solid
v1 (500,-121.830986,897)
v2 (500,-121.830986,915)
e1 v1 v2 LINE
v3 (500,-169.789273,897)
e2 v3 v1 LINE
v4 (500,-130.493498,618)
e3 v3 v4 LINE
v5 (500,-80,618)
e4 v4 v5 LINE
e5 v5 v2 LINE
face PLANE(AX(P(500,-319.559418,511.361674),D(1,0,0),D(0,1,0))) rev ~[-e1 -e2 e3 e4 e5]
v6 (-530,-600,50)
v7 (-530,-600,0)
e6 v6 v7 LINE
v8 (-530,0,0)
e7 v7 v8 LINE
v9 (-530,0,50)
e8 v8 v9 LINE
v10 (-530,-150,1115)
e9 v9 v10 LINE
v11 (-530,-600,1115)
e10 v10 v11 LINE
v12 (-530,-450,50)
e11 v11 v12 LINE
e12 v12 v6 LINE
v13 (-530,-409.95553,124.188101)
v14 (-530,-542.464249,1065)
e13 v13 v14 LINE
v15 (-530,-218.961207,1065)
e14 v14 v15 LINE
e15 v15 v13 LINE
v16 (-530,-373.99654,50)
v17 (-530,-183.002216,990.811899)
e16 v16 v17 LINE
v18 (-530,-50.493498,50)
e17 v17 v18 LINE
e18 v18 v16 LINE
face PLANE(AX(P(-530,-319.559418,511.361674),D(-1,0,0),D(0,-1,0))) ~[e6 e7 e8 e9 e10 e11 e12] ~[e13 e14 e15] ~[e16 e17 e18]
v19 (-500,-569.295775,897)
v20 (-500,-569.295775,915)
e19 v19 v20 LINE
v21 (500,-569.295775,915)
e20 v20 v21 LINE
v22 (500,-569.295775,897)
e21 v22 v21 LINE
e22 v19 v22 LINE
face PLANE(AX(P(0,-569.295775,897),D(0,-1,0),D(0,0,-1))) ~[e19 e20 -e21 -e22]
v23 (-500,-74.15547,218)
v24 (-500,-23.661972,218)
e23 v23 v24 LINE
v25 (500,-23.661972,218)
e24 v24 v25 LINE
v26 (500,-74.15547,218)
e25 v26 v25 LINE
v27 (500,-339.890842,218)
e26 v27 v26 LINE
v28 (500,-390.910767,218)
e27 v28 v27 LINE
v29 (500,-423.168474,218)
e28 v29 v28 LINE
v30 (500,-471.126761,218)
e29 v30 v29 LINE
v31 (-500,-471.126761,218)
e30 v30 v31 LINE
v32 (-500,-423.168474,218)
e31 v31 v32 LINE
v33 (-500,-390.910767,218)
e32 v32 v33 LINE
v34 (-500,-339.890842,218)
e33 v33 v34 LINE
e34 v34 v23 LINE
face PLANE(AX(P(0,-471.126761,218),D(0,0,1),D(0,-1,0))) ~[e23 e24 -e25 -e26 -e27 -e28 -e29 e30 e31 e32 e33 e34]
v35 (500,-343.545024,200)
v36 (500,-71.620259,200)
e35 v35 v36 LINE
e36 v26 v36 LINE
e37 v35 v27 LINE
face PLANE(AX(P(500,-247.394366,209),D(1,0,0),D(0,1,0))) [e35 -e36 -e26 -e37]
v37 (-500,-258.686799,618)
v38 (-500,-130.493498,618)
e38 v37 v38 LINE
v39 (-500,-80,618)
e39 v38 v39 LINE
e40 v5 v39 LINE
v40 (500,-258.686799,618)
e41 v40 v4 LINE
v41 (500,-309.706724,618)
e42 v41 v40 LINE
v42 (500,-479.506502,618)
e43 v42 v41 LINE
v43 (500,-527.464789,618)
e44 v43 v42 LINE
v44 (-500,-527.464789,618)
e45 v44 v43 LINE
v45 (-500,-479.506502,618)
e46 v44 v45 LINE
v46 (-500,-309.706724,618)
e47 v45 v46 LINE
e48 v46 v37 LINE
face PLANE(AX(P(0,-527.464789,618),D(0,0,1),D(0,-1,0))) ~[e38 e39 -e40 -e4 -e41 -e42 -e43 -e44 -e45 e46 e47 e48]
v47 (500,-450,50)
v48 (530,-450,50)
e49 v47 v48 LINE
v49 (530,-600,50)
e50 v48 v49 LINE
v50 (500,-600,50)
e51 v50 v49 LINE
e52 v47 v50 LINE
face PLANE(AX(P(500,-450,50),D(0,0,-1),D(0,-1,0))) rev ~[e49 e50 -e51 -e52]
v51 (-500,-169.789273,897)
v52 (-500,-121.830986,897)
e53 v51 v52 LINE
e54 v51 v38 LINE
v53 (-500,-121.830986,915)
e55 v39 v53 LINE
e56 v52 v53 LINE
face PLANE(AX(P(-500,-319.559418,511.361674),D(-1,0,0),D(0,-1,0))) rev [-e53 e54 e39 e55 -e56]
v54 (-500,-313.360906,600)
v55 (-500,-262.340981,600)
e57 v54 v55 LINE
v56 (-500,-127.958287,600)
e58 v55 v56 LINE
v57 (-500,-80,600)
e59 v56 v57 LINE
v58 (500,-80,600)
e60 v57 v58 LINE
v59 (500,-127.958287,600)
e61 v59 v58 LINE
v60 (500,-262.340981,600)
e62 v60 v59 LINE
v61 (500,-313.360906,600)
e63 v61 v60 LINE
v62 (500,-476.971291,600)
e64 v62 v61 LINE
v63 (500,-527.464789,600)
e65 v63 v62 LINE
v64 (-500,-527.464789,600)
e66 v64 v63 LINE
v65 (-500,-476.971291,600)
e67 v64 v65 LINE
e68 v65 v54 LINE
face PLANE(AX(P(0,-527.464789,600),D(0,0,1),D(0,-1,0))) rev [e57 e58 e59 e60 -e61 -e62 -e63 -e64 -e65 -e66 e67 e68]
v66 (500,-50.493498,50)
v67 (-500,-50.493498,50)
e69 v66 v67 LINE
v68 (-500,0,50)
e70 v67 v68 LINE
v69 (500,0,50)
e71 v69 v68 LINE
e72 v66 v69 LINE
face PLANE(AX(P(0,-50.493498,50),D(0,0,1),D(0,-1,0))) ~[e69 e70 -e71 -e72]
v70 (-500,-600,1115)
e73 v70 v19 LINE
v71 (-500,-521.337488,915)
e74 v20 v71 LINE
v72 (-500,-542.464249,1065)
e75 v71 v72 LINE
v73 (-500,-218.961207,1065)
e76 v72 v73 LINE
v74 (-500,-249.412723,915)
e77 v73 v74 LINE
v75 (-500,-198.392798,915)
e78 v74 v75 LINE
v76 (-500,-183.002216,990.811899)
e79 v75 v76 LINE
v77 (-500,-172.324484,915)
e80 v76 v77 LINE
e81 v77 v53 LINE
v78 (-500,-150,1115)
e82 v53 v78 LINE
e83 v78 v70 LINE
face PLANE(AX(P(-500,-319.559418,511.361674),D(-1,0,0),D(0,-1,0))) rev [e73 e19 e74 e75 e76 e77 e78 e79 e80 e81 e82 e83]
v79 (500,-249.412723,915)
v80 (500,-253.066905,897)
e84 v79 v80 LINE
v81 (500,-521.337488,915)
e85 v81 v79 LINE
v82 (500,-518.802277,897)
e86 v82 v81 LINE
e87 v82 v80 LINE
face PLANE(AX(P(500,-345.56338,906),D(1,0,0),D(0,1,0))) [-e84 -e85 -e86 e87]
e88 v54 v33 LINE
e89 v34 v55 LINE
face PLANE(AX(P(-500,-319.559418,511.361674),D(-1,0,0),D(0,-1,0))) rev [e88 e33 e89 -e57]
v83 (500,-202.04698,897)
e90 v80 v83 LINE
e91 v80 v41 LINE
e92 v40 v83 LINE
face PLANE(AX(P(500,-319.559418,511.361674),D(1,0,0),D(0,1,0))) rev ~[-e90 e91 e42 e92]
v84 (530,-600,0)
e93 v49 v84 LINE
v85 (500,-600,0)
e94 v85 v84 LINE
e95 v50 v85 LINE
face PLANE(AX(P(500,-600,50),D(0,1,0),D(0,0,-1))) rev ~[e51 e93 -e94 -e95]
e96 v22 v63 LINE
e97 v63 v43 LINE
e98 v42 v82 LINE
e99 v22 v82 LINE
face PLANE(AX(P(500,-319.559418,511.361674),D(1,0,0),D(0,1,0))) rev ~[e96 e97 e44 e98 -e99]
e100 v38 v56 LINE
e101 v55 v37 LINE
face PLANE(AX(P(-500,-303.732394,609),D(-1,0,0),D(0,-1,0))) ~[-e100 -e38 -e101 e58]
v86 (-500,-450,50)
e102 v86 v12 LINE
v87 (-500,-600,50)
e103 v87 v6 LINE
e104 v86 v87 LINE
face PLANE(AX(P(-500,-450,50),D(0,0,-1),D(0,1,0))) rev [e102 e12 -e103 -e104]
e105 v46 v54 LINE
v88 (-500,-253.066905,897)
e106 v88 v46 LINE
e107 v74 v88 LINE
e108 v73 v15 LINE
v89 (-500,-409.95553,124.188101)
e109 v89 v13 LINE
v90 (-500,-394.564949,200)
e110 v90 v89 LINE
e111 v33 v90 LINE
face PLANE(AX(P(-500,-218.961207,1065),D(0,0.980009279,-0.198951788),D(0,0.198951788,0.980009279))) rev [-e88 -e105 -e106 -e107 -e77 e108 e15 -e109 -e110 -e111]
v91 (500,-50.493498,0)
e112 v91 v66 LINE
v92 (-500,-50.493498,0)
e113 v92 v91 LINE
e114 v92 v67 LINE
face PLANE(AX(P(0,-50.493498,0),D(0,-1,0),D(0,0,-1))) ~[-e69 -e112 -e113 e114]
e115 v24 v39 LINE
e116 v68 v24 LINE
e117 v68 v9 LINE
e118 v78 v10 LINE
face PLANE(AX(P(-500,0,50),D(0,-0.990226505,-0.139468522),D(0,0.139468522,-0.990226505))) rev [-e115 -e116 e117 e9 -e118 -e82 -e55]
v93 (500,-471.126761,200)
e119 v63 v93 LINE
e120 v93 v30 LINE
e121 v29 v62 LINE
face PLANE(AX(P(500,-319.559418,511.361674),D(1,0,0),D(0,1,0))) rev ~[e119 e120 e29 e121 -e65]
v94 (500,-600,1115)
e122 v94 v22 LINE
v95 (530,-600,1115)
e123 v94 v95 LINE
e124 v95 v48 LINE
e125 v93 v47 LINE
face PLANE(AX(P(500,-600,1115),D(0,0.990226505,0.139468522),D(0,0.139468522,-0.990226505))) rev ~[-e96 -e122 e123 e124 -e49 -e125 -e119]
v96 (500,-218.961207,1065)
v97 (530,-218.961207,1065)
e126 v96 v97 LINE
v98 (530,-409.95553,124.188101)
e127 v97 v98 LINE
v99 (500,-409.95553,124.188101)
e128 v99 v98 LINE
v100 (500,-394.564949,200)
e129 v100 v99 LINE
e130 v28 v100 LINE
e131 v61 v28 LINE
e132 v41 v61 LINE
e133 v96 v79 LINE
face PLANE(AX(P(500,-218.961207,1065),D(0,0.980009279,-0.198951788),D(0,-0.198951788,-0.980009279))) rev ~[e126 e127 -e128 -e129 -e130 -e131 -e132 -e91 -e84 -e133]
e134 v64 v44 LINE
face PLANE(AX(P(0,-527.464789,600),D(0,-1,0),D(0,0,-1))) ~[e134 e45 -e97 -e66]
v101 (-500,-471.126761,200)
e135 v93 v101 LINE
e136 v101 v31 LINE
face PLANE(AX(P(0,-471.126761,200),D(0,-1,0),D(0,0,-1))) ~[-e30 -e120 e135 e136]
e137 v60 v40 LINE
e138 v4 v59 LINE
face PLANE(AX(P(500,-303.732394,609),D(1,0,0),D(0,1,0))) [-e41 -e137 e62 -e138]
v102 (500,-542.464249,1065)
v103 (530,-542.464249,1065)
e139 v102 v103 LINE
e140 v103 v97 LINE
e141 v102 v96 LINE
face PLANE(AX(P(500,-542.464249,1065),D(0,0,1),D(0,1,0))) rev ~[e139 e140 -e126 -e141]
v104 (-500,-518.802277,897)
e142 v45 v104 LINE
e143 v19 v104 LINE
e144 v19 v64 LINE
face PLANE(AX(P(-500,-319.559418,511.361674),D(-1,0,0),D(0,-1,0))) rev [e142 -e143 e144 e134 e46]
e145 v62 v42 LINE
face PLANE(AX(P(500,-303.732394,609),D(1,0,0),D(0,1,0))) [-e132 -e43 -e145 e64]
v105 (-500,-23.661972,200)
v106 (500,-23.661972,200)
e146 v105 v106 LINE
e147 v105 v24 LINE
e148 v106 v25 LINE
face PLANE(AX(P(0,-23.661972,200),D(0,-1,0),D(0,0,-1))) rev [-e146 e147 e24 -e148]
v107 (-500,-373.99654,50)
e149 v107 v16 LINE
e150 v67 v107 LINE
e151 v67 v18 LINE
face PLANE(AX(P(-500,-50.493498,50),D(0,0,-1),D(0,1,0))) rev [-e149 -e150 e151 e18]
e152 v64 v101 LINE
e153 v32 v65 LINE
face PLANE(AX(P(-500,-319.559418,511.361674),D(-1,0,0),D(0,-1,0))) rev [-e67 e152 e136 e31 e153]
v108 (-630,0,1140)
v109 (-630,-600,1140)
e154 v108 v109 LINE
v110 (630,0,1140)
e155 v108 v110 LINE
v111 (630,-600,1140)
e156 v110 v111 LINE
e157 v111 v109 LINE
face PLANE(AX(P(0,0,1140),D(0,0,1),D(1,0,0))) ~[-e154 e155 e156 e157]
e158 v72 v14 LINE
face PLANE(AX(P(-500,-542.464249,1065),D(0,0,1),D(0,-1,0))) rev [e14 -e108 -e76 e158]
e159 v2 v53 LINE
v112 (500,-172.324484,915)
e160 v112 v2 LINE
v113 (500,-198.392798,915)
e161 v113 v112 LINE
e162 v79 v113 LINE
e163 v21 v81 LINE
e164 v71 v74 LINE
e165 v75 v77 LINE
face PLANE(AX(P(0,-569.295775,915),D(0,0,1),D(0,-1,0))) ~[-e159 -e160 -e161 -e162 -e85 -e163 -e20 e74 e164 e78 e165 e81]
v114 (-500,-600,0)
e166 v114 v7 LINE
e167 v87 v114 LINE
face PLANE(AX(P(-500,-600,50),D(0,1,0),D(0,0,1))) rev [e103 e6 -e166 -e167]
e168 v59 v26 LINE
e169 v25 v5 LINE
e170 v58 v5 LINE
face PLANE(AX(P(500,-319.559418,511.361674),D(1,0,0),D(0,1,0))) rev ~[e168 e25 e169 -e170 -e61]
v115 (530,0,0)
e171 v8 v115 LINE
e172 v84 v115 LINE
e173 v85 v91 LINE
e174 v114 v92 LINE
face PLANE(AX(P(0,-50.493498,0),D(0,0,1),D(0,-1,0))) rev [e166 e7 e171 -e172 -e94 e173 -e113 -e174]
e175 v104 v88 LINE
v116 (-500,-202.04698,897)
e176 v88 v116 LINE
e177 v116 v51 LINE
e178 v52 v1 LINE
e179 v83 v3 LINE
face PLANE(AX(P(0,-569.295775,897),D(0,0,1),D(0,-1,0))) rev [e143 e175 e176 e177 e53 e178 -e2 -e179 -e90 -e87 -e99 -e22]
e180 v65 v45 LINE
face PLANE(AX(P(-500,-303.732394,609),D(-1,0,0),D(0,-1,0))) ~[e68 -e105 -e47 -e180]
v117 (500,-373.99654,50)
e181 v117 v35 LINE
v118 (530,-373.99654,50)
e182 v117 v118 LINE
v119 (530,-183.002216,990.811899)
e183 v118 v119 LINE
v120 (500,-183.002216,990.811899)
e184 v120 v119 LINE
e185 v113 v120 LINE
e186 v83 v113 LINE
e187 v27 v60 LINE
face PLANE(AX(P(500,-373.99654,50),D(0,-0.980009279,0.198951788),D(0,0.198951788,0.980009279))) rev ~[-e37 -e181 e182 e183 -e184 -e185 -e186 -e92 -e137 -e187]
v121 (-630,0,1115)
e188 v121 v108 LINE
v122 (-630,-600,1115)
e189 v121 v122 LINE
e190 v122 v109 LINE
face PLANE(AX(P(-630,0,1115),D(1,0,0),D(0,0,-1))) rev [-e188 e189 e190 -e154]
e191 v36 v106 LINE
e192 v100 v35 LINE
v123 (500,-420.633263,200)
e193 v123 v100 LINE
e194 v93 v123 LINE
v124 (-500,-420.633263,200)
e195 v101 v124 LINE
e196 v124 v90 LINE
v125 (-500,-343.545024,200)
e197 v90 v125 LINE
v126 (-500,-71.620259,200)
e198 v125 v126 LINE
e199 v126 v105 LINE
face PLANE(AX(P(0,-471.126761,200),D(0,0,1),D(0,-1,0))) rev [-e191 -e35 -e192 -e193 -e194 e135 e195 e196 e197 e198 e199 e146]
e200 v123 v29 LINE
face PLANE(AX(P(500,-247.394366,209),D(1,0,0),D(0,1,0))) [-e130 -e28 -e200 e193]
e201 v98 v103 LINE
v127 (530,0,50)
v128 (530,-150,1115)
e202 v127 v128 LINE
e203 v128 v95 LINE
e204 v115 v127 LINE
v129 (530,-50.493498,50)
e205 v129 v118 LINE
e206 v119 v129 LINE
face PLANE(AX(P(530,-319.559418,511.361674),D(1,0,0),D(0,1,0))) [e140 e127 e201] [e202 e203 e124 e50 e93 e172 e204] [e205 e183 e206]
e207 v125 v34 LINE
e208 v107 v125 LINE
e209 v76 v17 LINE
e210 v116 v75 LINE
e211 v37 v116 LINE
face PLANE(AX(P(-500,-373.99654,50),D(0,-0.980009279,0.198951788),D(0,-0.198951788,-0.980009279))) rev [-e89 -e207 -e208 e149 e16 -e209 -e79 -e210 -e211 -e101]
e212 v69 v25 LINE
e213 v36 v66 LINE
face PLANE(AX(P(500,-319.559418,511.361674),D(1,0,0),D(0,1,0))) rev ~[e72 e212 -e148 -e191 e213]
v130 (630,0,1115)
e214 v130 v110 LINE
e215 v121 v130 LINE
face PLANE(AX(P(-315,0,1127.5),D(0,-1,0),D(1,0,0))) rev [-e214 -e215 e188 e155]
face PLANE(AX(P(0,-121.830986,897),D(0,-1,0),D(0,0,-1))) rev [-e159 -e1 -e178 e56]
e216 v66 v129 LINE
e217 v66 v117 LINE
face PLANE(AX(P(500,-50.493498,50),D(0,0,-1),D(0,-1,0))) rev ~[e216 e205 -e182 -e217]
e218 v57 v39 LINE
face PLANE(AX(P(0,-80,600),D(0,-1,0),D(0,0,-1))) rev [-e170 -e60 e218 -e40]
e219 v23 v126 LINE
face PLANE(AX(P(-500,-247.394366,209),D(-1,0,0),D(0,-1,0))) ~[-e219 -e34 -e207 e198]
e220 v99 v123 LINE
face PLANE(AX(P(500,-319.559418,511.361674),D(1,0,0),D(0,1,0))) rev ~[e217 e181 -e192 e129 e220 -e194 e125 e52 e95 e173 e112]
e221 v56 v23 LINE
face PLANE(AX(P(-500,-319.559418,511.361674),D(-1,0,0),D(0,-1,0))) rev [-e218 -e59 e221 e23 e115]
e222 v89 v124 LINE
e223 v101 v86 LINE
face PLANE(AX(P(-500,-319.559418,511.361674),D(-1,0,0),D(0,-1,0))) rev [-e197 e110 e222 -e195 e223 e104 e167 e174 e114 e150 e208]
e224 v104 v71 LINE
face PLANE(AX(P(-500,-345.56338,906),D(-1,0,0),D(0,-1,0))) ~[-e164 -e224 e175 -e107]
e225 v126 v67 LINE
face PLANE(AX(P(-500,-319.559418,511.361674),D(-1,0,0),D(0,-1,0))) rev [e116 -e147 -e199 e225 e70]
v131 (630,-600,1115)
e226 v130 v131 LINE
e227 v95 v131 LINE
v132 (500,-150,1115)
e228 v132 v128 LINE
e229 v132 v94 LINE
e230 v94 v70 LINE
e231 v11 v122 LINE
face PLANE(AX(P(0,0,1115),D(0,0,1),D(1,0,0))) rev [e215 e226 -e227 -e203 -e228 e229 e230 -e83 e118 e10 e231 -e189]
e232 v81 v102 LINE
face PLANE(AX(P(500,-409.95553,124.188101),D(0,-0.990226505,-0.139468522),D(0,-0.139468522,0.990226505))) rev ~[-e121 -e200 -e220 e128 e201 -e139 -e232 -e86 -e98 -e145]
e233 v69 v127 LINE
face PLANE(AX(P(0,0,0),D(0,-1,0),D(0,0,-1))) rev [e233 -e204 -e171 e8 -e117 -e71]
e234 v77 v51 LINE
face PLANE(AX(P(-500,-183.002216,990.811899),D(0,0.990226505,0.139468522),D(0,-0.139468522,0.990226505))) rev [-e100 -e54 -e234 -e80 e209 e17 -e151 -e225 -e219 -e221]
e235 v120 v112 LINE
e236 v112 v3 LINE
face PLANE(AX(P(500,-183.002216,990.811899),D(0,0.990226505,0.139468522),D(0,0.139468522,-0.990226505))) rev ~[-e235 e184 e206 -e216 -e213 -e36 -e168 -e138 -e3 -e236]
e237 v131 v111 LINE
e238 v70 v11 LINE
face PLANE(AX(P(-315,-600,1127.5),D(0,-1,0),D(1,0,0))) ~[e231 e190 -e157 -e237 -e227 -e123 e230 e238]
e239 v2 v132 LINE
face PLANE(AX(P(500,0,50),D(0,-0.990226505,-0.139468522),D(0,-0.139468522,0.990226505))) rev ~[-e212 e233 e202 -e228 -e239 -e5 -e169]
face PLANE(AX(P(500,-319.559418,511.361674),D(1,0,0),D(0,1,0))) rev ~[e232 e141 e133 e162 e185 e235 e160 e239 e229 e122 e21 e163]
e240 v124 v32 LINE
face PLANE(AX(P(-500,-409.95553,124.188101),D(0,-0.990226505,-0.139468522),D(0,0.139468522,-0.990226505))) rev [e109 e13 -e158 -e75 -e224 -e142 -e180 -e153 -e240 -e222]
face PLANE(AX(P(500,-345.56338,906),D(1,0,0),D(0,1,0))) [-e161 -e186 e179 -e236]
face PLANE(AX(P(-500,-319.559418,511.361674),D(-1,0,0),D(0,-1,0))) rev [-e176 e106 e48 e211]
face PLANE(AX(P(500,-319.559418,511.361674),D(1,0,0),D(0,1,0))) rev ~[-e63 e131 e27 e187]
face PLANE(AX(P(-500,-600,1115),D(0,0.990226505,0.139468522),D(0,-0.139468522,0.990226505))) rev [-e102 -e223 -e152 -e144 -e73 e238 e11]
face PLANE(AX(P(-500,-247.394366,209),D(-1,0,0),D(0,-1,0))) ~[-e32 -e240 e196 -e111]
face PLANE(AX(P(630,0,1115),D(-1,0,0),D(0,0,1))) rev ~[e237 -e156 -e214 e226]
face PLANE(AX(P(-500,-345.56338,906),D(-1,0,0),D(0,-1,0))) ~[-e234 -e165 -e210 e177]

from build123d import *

# Parameters (mm, degrees)
F2_DEPTH = 30
F3_W     = 630
F3_H     = 25
F4_DEPTH = 600
F5_W     = 447.4647887324
F5_H     = 18
F6_DEPTH = 500
F7_W     = 50.4934979443
F7_H     = 50
F8_DEPTH = 500


with BuildPart() as f2:
    # F1 (on offset) → F2 (new body)
    with BuildSketch(Plane.YZ.offset(500)):
        Polygon((-600, 50), (-600, 0), (0, 0), (0, 50), (-150, 1115), (-600, 1115), (-450, 50), align=None)
        Polygon((-50.4934979443, 50), (-373.9965395023, 50), (-183.0022161165, 990.8118990221), align=None, mode=Mode.SUBTRACT)
        Polygon((-409.9555303624, 124.1881009779), (-542.4642485345, 1065), (-218.9612069765, 1065), align=None, mode=Mode.SUBTRACT)
    extrude(amount=F2_DEPTH)

    # F3 (on Front) → F4 (join)
    with BuildSketch(Plane.XZ):
        with Locations((315, 1127.5)):
            Rectangle(F3_W, F3_H)
    extrude(amount=F4_DEPTH)

    # F5 (on Right) → F6 (join, through all)
    with BuildSketch(Plane.YZ):
        with Locations((-345.5633802817, 906)):
            Rectangle(F5_W, F5_H)
        with Locations((-303.7323943662, 609)):
            Rectangle(F5_W, F5_H)
        with Locations((-247.3943661972, 209)):
            Rectangle(F5_W, F5_H)
    extrude(amount=F6_DEPTH)

    # F7 (on Right) → F8 (join, through all)
    with BuildSketch(Plane.YZ):
        with Locations((-25.2467489722, 25)):
            Rectangle(F7_W, F7_H)
    extrude(amount=F8_DEPTH)

    # F9: F2 across plane


with BuildPart() as f2_1:
    add(f2.part)
    add(f2.part.mirror(Plane.YZ))


solid = f2_1.part
